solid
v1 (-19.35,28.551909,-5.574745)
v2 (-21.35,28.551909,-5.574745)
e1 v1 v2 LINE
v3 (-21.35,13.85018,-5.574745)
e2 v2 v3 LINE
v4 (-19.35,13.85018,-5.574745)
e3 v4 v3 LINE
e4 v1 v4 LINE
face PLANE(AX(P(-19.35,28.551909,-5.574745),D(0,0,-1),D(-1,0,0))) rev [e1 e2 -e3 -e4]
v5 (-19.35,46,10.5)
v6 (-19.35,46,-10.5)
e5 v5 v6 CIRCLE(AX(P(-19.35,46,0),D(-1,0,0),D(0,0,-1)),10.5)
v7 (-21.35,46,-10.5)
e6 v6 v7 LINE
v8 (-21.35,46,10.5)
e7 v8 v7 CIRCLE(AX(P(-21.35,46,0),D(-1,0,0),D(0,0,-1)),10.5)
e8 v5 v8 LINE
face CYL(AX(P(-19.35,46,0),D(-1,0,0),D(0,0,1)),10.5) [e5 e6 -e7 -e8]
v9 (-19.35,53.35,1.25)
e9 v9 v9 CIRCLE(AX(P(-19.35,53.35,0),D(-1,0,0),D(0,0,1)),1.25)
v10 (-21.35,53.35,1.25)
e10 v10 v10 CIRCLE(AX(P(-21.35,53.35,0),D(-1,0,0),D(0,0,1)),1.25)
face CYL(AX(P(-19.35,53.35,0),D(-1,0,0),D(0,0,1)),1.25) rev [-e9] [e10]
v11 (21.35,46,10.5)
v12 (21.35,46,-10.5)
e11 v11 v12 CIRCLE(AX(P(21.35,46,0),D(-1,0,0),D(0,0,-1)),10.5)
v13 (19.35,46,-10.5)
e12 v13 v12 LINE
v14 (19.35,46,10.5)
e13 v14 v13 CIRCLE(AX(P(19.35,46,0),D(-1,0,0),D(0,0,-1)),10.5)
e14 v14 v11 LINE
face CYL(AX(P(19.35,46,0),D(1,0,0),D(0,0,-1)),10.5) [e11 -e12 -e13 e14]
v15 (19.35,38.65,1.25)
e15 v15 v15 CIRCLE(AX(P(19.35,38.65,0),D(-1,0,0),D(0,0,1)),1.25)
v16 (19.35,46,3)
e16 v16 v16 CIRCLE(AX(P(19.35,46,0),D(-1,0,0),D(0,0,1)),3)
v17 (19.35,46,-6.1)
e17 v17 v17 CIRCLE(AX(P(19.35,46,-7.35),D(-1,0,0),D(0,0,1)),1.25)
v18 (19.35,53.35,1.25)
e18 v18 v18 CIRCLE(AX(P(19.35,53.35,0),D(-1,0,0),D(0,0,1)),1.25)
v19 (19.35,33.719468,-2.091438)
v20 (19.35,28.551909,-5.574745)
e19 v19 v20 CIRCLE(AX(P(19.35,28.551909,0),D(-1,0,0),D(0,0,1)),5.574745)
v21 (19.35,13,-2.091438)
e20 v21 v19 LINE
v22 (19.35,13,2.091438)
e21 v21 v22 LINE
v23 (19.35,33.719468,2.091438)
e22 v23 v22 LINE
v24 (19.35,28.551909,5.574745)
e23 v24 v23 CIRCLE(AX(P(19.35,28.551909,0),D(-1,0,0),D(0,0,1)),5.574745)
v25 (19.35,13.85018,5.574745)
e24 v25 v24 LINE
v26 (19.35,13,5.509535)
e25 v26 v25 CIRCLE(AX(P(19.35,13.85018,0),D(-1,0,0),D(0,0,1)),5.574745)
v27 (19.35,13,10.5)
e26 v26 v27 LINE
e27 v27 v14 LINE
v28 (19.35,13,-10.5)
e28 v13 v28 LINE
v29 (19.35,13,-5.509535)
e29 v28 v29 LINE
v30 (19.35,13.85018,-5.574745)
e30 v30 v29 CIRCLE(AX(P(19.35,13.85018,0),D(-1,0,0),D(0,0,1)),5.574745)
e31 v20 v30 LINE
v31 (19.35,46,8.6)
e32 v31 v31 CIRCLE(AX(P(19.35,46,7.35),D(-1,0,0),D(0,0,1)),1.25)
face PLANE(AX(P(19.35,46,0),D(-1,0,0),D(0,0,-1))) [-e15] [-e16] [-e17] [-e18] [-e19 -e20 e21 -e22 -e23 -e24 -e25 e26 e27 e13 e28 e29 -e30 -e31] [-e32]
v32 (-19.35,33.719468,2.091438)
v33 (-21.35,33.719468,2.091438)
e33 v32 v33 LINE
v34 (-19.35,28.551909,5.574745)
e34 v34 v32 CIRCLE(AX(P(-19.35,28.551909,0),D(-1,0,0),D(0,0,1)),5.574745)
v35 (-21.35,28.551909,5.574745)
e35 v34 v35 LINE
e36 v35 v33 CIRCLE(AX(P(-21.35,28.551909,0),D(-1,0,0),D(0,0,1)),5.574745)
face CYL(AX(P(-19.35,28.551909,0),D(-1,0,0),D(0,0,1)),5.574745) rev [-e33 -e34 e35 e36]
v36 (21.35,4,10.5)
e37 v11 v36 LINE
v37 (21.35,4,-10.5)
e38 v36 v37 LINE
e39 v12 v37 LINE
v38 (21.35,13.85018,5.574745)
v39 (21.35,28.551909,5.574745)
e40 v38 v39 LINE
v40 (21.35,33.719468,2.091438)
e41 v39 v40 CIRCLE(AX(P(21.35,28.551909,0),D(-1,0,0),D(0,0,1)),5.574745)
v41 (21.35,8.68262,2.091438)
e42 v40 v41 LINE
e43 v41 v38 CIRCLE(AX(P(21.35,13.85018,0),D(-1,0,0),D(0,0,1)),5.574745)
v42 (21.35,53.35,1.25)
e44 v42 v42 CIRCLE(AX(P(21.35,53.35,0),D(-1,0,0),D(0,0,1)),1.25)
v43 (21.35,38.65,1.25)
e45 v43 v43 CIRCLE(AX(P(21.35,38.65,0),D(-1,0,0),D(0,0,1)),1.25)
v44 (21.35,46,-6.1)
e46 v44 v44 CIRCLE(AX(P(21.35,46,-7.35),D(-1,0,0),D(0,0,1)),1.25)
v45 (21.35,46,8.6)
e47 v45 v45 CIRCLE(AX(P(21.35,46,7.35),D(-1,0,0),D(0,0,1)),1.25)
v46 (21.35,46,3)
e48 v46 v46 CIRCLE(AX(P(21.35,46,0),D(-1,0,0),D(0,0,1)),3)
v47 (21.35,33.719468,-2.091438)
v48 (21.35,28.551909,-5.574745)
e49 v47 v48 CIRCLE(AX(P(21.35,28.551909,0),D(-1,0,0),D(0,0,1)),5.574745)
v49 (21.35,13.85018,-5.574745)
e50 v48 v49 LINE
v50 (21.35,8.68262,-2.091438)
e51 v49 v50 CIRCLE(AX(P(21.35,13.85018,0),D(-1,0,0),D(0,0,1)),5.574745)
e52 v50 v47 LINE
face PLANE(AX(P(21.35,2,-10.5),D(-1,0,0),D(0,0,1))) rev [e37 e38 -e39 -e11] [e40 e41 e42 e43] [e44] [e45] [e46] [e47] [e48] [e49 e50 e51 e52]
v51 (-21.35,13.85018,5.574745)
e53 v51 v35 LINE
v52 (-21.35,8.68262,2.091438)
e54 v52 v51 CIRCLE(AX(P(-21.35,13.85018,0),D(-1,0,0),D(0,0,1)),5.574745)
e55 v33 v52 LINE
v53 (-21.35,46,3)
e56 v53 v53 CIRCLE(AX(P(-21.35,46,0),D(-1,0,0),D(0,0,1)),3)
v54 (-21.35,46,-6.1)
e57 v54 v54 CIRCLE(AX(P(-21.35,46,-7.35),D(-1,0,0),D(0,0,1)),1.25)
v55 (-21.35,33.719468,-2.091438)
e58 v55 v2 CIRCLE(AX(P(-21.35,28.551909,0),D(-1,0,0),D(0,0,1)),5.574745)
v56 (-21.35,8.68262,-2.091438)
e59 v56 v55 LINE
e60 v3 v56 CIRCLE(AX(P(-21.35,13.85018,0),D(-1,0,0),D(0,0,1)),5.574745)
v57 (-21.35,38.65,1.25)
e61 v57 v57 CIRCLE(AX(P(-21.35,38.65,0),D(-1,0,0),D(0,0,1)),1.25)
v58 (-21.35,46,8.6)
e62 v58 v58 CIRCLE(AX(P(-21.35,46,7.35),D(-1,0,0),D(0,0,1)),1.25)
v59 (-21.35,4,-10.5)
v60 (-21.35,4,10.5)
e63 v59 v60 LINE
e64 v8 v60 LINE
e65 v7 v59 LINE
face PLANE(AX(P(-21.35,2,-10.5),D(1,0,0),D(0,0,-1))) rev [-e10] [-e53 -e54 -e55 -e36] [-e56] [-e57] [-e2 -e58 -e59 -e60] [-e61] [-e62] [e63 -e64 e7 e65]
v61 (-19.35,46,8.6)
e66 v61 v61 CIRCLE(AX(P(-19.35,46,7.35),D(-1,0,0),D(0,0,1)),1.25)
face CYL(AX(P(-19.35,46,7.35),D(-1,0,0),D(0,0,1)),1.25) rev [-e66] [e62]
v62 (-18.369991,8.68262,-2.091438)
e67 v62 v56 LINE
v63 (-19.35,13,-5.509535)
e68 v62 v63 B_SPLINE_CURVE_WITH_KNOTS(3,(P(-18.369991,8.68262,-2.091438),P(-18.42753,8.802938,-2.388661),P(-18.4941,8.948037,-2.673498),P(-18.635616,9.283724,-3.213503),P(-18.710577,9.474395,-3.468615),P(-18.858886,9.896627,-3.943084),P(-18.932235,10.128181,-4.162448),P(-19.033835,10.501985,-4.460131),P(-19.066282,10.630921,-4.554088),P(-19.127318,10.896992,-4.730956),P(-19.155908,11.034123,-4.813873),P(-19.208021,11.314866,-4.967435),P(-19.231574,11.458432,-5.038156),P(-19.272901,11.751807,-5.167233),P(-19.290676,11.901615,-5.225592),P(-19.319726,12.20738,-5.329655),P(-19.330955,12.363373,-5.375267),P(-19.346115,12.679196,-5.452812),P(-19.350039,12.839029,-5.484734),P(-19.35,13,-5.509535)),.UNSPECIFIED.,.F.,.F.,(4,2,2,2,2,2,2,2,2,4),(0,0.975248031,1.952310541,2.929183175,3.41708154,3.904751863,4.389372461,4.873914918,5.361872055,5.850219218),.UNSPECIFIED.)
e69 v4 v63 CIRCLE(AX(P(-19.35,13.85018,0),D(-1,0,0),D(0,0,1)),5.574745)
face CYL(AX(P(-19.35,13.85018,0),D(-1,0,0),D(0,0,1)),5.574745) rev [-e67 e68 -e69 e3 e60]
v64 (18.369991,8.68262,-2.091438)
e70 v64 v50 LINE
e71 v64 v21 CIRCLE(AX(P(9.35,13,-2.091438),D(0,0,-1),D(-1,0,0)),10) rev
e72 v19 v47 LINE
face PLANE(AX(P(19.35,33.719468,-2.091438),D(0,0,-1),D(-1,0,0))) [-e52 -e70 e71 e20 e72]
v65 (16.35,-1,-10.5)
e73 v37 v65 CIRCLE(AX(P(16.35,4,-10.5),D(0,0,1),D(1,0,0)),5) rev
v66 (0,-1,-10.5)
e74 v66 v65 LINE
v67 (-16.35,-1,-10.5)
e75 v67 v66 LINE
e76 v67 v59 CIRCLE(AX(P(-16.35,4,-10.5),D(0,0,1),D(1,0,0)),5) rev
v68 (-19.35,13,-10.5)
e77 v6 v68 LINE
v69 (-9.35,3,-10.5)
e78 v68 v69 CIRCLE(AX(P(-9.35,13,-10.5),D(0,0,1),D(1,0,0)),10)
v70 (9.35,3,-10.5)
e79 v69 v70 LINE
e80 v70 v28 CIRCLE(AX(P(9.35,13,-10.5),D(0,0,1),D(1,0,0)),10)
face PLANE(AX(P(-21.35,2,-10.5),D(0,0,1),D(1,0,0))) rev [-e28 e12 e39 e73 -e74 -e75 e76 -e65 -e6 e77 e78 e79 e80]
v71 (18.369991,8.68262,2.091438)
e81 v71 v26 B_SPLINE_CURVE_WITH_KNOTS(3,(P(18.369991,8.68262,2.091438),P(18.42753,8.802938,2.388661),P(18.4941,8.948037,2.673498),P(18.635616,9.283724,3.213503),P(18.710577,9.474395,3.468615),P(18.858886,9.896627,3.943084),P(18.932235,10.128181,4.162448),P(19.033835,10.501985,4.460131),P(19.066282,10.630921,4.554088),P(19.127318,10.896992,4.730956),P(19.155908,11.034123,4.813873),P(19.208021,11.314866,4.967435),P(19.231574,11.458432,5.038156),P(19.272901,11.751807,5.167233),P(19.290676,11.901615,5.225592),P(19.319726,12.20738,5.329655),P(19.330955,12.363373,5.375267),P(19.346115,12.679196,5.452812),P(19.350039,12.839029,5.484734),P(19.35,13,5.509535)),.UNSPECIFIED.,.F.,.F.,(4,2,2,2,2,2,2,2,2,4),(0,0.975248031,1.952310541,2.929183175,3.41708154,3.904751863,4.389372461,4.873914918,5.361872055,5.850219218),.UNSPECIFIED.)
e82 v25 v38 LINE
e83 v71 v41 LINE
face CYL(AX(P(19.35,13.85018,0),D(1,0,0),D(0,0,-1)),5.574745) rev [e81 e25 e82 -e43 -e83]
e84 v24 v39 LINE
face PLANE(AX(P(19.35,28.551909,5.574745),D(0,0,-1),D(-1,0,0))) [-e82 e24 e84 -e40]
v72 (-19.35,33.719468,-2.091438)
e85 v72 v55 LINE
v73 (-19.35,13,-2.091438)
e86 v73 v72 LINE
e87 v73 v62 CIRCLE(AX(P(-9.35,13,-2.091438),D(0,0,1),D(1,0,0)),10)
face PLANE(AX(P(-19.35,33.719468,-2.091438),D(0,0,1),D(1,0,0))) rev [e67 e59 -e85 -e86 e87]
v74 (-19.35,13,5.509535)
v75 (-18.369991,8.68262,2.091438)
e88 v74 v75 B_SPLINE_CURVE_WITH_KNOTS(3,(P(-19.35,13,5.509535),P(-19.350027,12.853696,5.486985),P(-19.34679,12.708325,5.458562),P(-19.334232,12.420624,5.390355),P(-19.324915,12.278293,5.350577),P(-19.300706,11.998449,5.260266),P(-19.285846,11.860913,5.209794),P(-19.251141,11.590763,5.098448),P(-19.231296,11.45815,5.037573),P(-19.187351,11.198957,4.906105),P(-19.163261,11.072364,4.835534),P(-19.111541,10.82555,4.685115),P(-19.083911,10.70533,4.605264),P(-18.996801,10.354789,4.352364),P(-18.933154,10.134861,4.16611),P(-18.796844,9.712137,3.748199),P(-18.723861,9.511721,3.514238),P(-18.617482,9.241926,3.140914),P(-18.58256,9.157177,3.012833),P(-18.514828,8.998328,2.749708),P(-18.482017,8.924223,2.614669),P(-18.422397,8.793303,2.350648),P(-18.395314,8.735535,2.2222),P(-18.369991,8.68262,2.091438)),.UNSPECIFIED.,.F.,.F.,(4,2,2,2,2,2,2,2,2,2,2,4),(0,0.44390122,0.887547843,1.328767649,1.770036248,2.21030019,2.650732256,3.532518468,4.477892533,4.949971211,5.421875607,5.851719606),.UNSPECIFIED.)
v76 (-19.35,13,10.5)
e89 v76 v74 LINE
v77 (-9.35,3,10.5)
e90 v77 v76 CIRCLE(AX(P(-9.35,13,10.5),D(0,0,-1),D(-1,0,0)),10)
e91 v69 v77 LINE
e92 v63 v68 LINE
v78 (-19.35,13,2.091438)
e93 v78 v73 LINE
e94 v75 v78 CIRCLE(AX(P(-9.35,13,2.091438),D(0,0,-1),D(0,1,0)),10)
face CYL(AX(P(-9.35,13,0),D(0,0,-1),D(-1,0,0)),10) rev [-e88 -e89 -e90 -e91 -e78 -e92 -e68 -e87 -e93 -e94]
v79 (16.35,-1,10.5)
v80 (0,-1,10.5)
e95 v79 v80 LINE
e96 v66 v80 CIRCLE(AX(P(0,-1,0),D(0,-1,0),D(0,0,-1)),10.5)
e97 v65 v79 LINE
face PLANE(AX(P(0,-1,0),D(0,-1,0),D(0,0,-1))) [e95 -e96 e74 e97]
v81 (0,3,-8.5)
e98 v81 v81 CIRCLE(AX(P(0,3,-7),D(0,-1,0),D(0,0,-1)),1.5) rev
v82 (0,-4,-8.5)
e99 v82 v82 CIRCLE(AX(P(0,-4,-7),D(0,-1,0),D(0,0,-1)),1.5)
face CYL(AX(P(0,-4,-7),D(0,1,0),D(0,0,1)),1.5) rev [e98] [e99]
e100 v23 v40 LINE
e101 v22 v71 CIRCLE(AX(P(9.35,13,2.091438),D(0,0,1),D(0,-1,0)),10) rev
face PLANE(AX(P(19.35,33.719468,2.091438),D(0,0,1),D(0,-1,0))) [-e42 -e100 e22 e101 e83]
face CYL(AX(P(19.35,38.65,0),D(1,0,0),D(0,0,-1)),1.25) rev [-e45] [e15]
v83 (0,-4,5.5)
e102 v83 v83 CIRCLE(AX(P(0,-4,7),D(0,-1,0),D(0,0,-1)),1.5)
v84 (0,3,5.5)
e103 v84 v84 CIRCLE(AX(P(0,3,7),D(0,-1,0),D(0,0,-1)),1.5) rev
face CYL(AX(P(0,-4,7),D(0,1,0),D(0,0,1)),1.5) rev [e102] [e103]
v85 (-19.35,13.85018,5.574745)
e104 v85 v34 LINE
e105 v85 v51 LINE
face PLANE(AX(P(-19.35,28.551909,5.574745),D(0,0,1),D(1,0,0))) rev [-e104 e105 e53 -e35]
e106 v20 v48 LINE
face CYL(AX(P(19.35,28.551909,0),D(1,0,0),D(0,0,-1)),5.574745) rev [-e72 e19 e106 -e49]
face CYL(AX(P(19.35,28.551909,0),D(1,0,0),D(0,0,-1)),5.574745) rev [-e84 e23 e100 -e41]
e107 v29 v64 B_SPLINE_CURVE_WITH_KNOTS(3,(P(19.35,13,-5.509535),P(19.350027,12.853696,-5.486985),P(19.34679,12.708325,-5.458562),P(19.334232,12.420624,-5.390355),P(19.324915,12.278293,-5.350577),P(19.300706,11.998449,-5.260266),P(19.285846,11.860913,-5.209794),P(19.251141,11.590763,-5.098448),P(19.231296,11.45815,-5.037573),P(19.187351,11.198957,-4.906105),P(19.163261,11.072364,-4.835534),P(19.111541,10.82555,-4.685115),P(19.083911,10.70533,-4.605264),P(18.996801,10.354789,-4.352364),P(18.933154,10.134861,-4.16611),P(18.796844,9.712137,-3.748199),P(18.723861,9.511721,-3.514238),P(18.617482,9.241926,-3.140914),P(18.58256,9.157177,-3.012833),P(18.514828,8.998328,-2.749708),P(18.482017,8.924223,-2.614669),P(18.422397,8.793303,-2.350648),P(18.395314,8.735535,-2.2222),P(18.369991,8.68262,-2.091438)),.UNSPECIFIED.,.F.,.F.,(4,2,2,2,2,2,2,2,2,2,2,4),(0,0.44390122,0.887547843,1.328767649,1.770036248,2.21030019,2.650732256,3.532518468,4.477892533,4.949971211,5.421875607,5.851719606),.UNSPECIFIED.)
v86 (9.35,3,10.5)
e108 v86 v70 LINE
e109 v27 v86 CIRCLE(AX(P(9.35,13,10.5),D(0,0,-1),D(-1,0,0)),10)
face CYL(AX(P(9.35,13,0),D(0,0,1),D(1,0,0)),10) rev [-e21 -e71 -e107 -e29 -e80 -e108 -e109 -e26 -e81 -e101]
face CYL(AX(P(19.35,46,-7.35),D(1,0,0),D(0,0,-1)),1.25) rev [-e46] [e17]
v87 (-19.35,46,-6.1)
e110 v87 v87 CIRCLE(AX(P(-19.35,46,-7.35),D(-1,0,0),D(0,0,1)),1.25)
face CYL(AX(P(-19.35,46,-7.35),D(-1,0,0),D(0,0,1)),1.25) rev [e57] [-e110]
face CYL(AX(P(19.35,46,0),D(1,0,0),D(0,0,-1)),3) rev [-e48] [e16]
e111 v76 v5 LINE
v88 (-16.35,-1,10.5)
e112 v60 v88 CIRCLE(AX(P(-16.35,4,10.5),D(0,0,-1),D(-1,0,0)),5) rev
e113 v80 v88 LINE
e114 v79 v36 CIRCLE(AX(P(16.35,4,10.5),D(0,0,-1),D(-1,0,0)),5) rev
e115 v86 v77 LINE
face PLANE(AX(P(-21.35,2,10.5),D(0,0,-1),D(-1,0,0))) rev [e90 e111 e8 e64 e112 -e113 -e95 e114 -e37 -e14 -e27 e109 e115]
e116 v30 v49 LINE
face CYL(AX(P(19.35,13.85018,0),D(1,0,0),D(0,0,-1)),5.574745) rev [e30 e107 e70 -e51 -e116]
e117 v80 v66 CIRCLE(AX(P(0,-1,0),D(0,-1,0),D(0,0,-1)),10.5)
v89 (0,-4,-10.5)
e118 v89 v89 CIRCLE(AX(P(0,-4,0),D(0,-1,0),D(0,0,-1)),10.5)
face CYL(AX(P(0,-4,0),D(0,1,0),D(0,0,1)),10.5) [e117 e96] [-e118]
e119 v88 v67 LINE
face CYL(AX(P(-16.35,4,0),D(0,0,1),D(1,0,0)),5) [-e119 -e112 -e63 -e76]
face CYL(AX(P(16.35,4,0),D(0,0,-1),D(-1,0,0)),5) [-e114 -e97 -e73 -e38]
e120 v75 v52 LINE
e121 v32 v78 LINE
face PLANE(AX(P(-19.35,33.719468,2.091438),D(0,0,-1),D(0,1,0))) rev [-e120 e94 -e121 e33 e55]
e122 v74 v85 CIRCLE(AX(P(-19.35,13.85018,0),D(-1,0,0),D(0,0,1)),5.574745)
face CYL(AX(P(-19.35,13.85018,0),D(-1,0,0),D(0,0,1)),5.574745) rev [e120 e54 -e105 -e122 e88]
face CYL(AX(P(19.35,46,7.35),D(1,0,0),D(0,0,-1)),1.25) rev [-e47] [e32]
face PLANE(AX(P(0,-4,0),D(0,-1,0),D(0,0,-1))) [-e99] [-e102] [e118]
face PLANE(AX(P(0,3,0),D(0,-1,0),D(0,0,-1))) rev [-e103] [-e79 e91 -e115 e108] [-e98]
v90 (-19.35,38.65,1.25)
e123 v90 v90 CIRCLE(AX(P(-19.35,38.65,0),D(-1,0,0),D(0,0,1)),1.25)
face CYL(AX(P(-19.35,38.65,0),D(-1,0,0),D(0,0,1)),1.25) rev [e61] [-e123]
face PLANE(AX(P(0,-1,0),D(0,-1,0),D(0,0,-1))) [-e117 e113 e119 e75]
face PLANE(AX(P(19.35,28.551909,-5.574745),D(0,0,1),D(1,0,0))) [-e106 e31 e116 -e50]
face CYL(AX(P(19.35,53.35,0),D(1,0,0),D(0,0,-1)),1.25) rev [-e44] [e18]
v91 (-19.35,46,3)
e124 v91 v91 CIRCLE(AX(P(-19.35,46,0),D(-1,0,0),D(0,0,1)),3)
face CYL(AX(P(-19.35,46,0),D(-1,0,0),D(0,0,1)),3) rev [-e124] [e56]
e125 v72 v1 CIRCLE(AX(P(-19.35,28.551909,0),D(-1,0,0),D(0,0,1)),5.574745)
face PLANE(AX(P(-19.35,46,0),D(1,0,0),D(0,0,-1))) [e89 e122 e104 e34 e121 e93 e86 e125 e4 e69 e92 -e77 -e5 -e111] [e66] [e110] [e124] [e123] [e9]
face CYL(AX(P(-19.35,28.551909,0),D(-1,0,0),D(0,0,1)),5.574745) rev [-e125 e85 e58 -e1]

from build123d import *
from build123d.topology import SkipClean

# Parameters (mm, degrees)
SKETCH_1_W           = 42.7
SKETCH_1_H           = 21
SKETCH_1_R           = 1.5
EXTRUDE_1_DEPTH      = 2
SKETCH_2_R           = 1.25
SKETCH_2_R_2         = 3
EXTRUDE_2_DEPTH      = 2
EXTRUDE_3_DEPTH      = 1
EXTRUDE_3_DEPTH_BACK = 3
SKETCH_3_W           = 42.7
SKETCH_3_H           = 21
SKETCH_4_R           = 10.5
SKETCH_4_R_2         = 1.5
EXTRUDE_4_DEPTH      = 3
FILLET_1_R           = 10
FILLET_2_R           = 5
CUT_EXTRUDE_START    = -4
SKETCH_6_R           = 1.5
CUT_EXTRUDE_1_DEPTH  = 4


with BuildPart() as part:
    # 草图1 → 凸台-拉伸1 (new body)
    with BuildSketch(Plane(origin=(0, 0, 0), x_dir=(1, 0, 0), z_dir=(0, 1, 0))):
        Rectangle(SKETCH_1_W, SKETCH_1_H)
        with Locations(Location((7.5, 5, 0), (0, 0, 270))):
            Circle(SKETCH_1_R, mode=Mode.SUBTRACT)
        with Locations(Location((7.5, -5, 0), (0, 0, 90))):
            Circle(SKETCH_1_R, mode=Mode.SUBTRACT)
        with Locations(Location((-7.5, -5, 0), (0, 0, 270))):
            Circle(SKETCH_1_R, mode=Mode.SUBTRACT)
        with Locations(Location((-7.5, 5, 0), (0, 0, 90))):
            Circle(SKETCH_1_R, mode=Mode.SUBTRACT)
        with BuildLine():
            Line((8.017950723, 1.550908082), (12.912587519, 1.550908082))
            ThreePointArc((12.912587519, 1.550908082), (14.126270768, 1.145131224), (14.697546856, 0))
            ThreePointArc((14.697546856, 0), (14.126270768, -1.145131224), (12.912587519, -1.550908082))
            Line((12.912587519, -1.550908082), (8.017950723, -1.550908082))
            add(Edge.make_bspline(
                [(0, -7.407271614), (2.092471107, -7.358009404), (3.043739342, -2.951912586), (6.007732496, -1.626733157), (8.017950723, -1.550908082)],
                knots=[0, 0, 0, 0, 0.496822763, 1, 1, 1, 1], degree=3))
            add(Edge.make_bspline(
                [(0, -7.407271614), (-2.092471107, -7.358009404), (-3.043739342, -2.951912586), (-6.007732496, -1.626733157), (-8.017950723, -1.550908082)],
                knots=[0, 0, 0, 0, 0.496822763, 1, 1, 1, 1], degree=3))
            Line((-8.017950723, -1.550908082), (-12.912587519, -1.550908082))
            ThreePointArc((-12.912587519, -1.550908082), (-14.126270768, -1.145131224), (-14.697546856, 0))
            ThreePointArc((-14.697546856, 0), (-14.126270768, 1.145131224), (-12.912587519, 1.550908082))
            Line((-12.912587519, 1.550908082), (-8.017950723, 1.550908082))
            add(Edge.make_bspline(
                [(0, 7.407271614), (-2.092471107, 7.358009404), (-3.043739342, 2.951912586), (-6.007732496, 1.626733157), (-8.017950723, 1.550908082)],
                knots=[0, 0, 0, 0, 0.496822763, 1, 1, 1, 1], degree=3))
            add(Edge.make_bspline(
                [(0, 7.407271614), (2.092471107, 7.358009404), (3.043739342, 2.951912586), (6.007732496, 1.626733157), (8.017950723, 1.550908082)],
                knots=[0, 0, 0, 0, 0.496822763, 1, 1, 1, 1], degree=3))
        make_face(mode=Mode.SUBTRACT)
    extrude(amount=EXTRUDE_1_DEPTH)

    # 草图2 → 凸台-拉伸2 (add)
    with BuildSketch(Plane.ZY.offset(21.35)):
        with BuildLine():
            Line((-10.5, 2), (-10.5, 46))
            ThreePointArc((-10.5, 46), (0, 56.5), (10.5, 46))
            Line((10.5, 46), (10.5, 2))
            Line((10.5, 2), (-10.5, 2))
        make_face()
        with Locations((0, 38.65)):
            Circle(SKETCH_2_R, mode=Mode.SUBTRACT)
        with Locations((-7.35, 46)):
            Circle(SKETCH_2_R, mode=Mode.SUBTRACT)
        with Locations((0, 53.35)):
            Circle(SKETCH_2_R, mode=Mode.SUBTRACT)
        with Locations((7.35, 46)):
            Circle(SKETCH_2_R, mode=Mode.SUBTRACT)
        with Locations((0, 46)):
            Circle(SKETCH_2_R_2, mode=Mode.SUBTRACT)
        with BuildLine():
            Line((-2.091438456, 33.71946821), (-2.091438456, 8.682620376))
            ThreePointArc((-2.091438456, 8.682620376), (-4.622608783, 10.734209017), (-5.574745456, 13.850179963))
            Line((-5.574745456, 13.850179963), (-5.574745456, 28.551908623))
            ThreePointArc((-5.574745456, 28.551908623), (-4.622608783, 31.667879569), (-2.091438456, 33.71946821))
        make_face(mode=Mode.SUBTRACT)
        with BuildLine():
            Line((5.574745456, 28.551908623), (5.574745456, 13.850179963))
            ThreePointArc((5.574745456, 13.850179963), (4.622608783, 10.734209017), (2.091438456, 8.682620376))
            Line((2.091438456, 8.682620376), (2.091438456, 33.71946821))
            ThreePointArc((2.091438456, 33.71946821), (4.622608783, 31.667879569), (5.574745456, 28.551908623))
        make_face(mode=Mode.SUBTRACT)
    extrude_2 = extrude(amount=-EXTRUDE_2_DEPTH)

    # 镜向1: 凸台-拉伸2 across plane
    add(extrude_2.mirror(Plane(origin=(0, 0, 0), x_dir=(0, 0, 1), z_dir=(1, 0, 0))))

    # 草图3 → 凸台-拉伸3 (add, two sides: drawn at the far end of the back side and taken through both)
    with BuildSketch(Plane.XZ.offset(-EXTRUDE_3_DEPTH_BACK)):
        Rectangle(SKETCH_3_W, SKETCH_3_H)
    extrude(amount=EXTRUDE_3_DEPTH + EXTRUDE_3_DEPTH_BACK)

    # 草图4 → 凸台-拉伸4 (add)
    with BuildSketch(Plane.XZ.offset(1)):
        with Locations(Location((0, 0, 0), (0, 0, 270))):
            Circle(SKETCH_4_R)
        with Locations(Location((0, 7, 0), (0, 0, 270))):
            Circle(SKETCH_4_R_2, mode=Mode.SUBTRACT)
        with Locations(Location((0, -7, 0), (0, 0, 270))):
            Circle(SKETCH_4_R_2, mode=Mode.SUBTRACT)
    extrude(amount=EXTRUDE_4_DEPTH)

    # 圆角1
    # the kernel refuses this fillet: 10 mm, written as the material it adds along each edge
    with BuildSketch(Plane(origin=(19.35, 3, -10.5), x_dir=(-1, 0, 0), z_dir=(0, 0, 1))) as fillet_1_piece_1_section:
        with BuildLine():
            CenterArc((FILLET_1_R, -FILLET_1_R), FILLET_1_R, 90, 90)
            Line((0, -FILLET_1_R), (0, 0))
            Line((0, 0), (FILLET_1_R, 0))
        make_face()
    fillet_1_piece_1 = extrude(amount=21, mode=Mode.PRIVATE)
    fillet_1_piece_1 = fillet_1_piece_1 - Plane(origin=(17.043313865, 13.850179963, 0), x_dir=(0, 0, 1), z_dir=(1, 0, 0)) * Cylinder(5.574745456, 82, mode=Mode.PRIVATE)
    fillet_1_piece_1 = split(fillet_1_piece_1, bisect_by=Plane(origin=(17.043313865, 5.15733044, -2.091438456), z_dir=(0, 0, -1)), keep=Keep.TOP, mode=Mode.PRIVATE)
    add(fillet_1_piece_1)
    with BuildSketch(Plane(origin=(19.35, 3, -10.5), x_dir=(-1, 0, 0), z_dir=(0, 0, 1))) as fillet_1_piece_2_section:
        with BuildLine():
            CenterArc((FILLET_1_R, -FILLET_1_R), FILLET_1_R, 90, 90)
            Line((0, -FILLET_1_R), (0, 0))
            Line((0, 0), (FILLET_1_R, 0))
        make_face()
    fillet_1_piece_2 = extrude(amount=21, mode=Mode.PRIVATE)
    fillet_1_piece_2 = split(fillet_1_piece_2, bisect_by=Plane(origin=(16.850424397, 4.734237848, 2.091438456), z_dir=(0, 0, -1)), keep=Keep.TOP, mode=Mode.PRIVATE)
    fillet_1_piece_2 = fillet_1_piece_2 - Plane(origin=(16.850424397, 13.850179963, 0), x_dir=(0, 0, 1), z_dir=(1, 0, 0)) * Cylinder(5.574745456, 82, mode=Mode.PRIVATE)
    fillet_1_piece_2 = split(fillet_1_piece_2, bisect_by=Plane(origin=(16.850424397, 4.734237848, -2.091438456), z_dir=(0, 0, 1)), keep=Keep.TOP, mode=Mode.PRIVATE)
    add(fillet_1_piece_2)
    with BuildSketch(Plane(origin=(19.35, 3, -10.5), x_dir=(-1, 0, 0), z_dir=(0, 0, 1))) as fillet_1_piece_3_section:
        with BuildLine():
            CenterArc((FILLET_1_R, -FILLET_1_R), FILLET_1_R, 90, 90)
            Line((0, -FILLET_1_R), (0, 0))
            Line((0, 0), (FILLET_1_R, 0))
        make_face()
    fillet_1_piece_3 = extrude(amount=21, mode=Mode.PRIVATE)
    fillet_1_piece_3 = split(fillet_1_piece_3, bisect_by=Plane(origin=(19.170455524, 9.949953682, 2.091438456), z_dir=(0, 0, -1)), keep=Keep.TOP, mode=Mode.PRIVATE)
    fillet_1_piece_3 = fillet_1_piece_3 & Plane(origin=(19.170455524, 13.850179963, 0), x_dir=(0, 0, 1), z_dir=(1, 0, 0)) * Cylinder(5.574745456, 82, mode=Mode.PRIVATE)
    fillet_1_piece_3 = split(fillet_1_piece_3, bisect_by=Plane(origin=(19.170455524, 9.949953682, -2.091438456), z_dir=(0, 0, 1)), keep=Keep.TOP, mode=Mode.PRIVATE)
    add(fillet_1_piece_3)
    with BuildSketch(Plane(origin=(19.35, 3, -10.5), x_dir=(-1, 0, 0), z_dir=(0, 0, 1))) as fillet_1_piece_4_section:
        with BuildLine():
            CenterArc((FILLET_1_R, -FILLET_1_R), FILLET_1_R, 90, 90)
            Line((0, -FILLET_1_R), (0, 0))
            Line((0, 0), (FILLET_1_R, 0))
        make_face()
    fillet_1_piece_4 = extrude(amount=21, mode=Mode.PRIVATE)
    fillet_1_piece_4 = split(fillet_1_piece_4, bisect_by=Plane(origin=(17.043313289, 5.157330644, 2.091438456), z_dir=(0, 0, 1)), keep=Keep.TOP, mode=Mode.PRIVATE)
    fillet_1_piece_4 = fillet_1_piece_4 - Plane(origin=(17.043313289, 13.850179963, 0), x_dir=(0, 0, 1), z_dir=(1, 0, 0)) * Cylinder(5.574745456, 82, mode=Mode.PRIVATE)
    add(fillet_1_piece_4)
    with BuildSketch(Plane(origin=(-19.35, 3, -10.5), x_dir=(0, 1, 0), z_dir=(0, 0, 1))) as fillet_1_piece_5_section:
        with BuildLine():
            CenterArc((FILLET_1_R, -FILLET_1_R), FILLET_1_R, 90, 90)
            Line((0, -FILLET_1_R), (0, 0))
            Line((0, 0), (FILLET_1_R, 0))
        make_face()
    fillet_1_piece_5 = extrude(amount=21, mode=Mode.PRIVATE)
    fillet_1_piece_5 = fillet_1_piece_5 - Plane(origin=(-17.043313718, 13.850179963, 0), x_dir=(0, 0, 1), z_dir=(-1, 0, 0)) * Cylinder(5.574745456, 82, mode=Mode.PRIVATE)
    fillet_1_piece_5 = split(fillet_1_piece_5, bisect_by=Plane(origin=(-17.043313718, 5.157330569, -2.091438456), z_dir=(0, 0, -1)), keep=Keep.TOP, mode=Mode.PRIVATE)
    add(fillet_1_piece_5)
    with BuildSketch(Plane(origin=(-19.35, 3, -10.5), x_dir=(0, 1, 0), z_dir=(0, 0, 1))) as fillet_1_piece_6_section:
        with BuildLine():
            CenterArc((FILLET_1_R, -FILLET_1_R), FILLET_1_R, 90, 90)
            Line((0, -FILLET_1_R), (0, 0))
            Line((0, 0), (FILLET_1_R, 0))
        make_face()
    fillet_1_piece_6 = extrude(amount=21, mode=Mode.PRIVATE)
    fillet_1_piece_6 = split(fillet_1_piece_6, bisect_by=Plane(origin=(-16.850424159, 4.734237852, 2.091438456), z_dir=(0, 0, -1)), keep=Keep.TOP, mode=Mode.PRIVATE)
    fillet_1_piece_6 = fillet_1_piece_6 - Plane(origin=(-16.850424159, 13.850179963, 0), x_dir=(0, 0, 1), z_dir=(-1, 0, 0)) * Cylinder(5.574745456, 82, mode=Mode.PRIVATE)
    fillet_1_piece_6 = split(fillet_1_piece_6, bisect_by=Plane(origin=(-16.850424159, 4.734237852, -2.091438456), z_dir=(0, 0, 1)), keep=Keep.TOP, mode=Mode.PRIVATE)
    add(fillet_1_piece_6)
    with BuildSketch(Plane(origin=(-19.35, 3, -10.5), x_dir=(0, 1, 0), z_dir=(0, 0, 1))) as fillet_1_piece_7_section:
        with BuildLine():
            CenterArc((FILLET_1_R, -FILLET_1_R), FILLET_1_R, 90, 90)
            Line((0, -FILLET_1_R), (0, 0))
            Line((0, 0), (FILLET_1_R, 0))
        make_face()
    fillet_1_piece_7 = extrude(amount=21, mode=Mode.PRIVATE)
    fillet_1_piece_7 = split(fillet_1_piece_7, bisect_by=Plane(origin=(-17.043313652, 5.157330325, 2.091438456), z_dir=(0, 0, 1)), keep=Keep.TOP, mode=Mode.PRIVATE)
    fillet_1_piece_7 = fillet_1_piece_7 - Plane(origin=(-17.043313652, 13.850179963, 0), x_dir=(0, 0, 1), z_dir=(-1, 0, 0)) * Cylinder(5.574745456, 82, mode=Mode.PRIVATE)
    add(fillet_1_piece_7)
    with BuildSketch(Plane(origin=(-19.35, 3, -10.5), x_dir=(0, 1, 0), z_dir=(0, 0, 1))) as fillet_1_piece_8_section:
        with BuildLine():
            CenterArc((FILLET_1_R, -FILLET_1_R), FILLET_1_R, 90, 90)
            Line((0, -FILLET_1_R), (0, 0))
            Line((0, 0), (FILLET_1_R, 0))
        make_face()
    fillet_1_piece_8 = extrude(amount=21, mode=Mode.PRIVATE)
    fillet_1_piece_8 = split(fillet_1_piece_8, bisect_by=Plane(origin=(-19.170455532, 9.949953694, 2.091438456), z_dir=(0, 0, -1)), keep=Keep.TOP, mode=Mode.PRIVATE)
    fillet_1_piece_8 = fillet_1_piece_8 & Plane(origin=(-19.170455532, 13.850179963, 0), x_dir=(0, 0, 1), z_dir=(-1, 0, 0)) * Cylinder(5.574745456, 82, mode=Mode.PRIVATE)
    fillet_1_piece_8 = split(fillet_1_piece_8, bisect_by=Plane(origin=(-19.170455532, 9.949953694, -2.091438456), z_dir=(0, 0, 1)), keep=Keep.TOP, mode=Mode.PRIVATE)
    add(fillet_1_piece_8)

    # 圆角2
    fillet_2_edges = [part.edges().sort_by_distance(p)[0] for p in [
        (-21.35, -1, 0),
        (21.35, -1, 0),
    ]]
    fillet(fillet_2_edges, radius=FILLET_2_R)

    # 草图6 → 切除-拉伸1 (cut)
    with SkipClean():  # the faces are left unmerged after this step: merging them gives an invalid solid
        with BuildSketch(Plane.XZ.offset(1).offset(CUT_EXTRUDE_START)):
            with Locations(Location((0, 7, 0), (0, 0, 270))):
                Circle(SKETCH_6_R)
            with Locations(Location((0, -7, 0), (0, 0, 270))):
                Circle(SKETCH_6_R)
        extrude(amount=CUT_EXTRUDE_1_DEPTH, mode=Mode.SUBTRACT)


solid = part.part
